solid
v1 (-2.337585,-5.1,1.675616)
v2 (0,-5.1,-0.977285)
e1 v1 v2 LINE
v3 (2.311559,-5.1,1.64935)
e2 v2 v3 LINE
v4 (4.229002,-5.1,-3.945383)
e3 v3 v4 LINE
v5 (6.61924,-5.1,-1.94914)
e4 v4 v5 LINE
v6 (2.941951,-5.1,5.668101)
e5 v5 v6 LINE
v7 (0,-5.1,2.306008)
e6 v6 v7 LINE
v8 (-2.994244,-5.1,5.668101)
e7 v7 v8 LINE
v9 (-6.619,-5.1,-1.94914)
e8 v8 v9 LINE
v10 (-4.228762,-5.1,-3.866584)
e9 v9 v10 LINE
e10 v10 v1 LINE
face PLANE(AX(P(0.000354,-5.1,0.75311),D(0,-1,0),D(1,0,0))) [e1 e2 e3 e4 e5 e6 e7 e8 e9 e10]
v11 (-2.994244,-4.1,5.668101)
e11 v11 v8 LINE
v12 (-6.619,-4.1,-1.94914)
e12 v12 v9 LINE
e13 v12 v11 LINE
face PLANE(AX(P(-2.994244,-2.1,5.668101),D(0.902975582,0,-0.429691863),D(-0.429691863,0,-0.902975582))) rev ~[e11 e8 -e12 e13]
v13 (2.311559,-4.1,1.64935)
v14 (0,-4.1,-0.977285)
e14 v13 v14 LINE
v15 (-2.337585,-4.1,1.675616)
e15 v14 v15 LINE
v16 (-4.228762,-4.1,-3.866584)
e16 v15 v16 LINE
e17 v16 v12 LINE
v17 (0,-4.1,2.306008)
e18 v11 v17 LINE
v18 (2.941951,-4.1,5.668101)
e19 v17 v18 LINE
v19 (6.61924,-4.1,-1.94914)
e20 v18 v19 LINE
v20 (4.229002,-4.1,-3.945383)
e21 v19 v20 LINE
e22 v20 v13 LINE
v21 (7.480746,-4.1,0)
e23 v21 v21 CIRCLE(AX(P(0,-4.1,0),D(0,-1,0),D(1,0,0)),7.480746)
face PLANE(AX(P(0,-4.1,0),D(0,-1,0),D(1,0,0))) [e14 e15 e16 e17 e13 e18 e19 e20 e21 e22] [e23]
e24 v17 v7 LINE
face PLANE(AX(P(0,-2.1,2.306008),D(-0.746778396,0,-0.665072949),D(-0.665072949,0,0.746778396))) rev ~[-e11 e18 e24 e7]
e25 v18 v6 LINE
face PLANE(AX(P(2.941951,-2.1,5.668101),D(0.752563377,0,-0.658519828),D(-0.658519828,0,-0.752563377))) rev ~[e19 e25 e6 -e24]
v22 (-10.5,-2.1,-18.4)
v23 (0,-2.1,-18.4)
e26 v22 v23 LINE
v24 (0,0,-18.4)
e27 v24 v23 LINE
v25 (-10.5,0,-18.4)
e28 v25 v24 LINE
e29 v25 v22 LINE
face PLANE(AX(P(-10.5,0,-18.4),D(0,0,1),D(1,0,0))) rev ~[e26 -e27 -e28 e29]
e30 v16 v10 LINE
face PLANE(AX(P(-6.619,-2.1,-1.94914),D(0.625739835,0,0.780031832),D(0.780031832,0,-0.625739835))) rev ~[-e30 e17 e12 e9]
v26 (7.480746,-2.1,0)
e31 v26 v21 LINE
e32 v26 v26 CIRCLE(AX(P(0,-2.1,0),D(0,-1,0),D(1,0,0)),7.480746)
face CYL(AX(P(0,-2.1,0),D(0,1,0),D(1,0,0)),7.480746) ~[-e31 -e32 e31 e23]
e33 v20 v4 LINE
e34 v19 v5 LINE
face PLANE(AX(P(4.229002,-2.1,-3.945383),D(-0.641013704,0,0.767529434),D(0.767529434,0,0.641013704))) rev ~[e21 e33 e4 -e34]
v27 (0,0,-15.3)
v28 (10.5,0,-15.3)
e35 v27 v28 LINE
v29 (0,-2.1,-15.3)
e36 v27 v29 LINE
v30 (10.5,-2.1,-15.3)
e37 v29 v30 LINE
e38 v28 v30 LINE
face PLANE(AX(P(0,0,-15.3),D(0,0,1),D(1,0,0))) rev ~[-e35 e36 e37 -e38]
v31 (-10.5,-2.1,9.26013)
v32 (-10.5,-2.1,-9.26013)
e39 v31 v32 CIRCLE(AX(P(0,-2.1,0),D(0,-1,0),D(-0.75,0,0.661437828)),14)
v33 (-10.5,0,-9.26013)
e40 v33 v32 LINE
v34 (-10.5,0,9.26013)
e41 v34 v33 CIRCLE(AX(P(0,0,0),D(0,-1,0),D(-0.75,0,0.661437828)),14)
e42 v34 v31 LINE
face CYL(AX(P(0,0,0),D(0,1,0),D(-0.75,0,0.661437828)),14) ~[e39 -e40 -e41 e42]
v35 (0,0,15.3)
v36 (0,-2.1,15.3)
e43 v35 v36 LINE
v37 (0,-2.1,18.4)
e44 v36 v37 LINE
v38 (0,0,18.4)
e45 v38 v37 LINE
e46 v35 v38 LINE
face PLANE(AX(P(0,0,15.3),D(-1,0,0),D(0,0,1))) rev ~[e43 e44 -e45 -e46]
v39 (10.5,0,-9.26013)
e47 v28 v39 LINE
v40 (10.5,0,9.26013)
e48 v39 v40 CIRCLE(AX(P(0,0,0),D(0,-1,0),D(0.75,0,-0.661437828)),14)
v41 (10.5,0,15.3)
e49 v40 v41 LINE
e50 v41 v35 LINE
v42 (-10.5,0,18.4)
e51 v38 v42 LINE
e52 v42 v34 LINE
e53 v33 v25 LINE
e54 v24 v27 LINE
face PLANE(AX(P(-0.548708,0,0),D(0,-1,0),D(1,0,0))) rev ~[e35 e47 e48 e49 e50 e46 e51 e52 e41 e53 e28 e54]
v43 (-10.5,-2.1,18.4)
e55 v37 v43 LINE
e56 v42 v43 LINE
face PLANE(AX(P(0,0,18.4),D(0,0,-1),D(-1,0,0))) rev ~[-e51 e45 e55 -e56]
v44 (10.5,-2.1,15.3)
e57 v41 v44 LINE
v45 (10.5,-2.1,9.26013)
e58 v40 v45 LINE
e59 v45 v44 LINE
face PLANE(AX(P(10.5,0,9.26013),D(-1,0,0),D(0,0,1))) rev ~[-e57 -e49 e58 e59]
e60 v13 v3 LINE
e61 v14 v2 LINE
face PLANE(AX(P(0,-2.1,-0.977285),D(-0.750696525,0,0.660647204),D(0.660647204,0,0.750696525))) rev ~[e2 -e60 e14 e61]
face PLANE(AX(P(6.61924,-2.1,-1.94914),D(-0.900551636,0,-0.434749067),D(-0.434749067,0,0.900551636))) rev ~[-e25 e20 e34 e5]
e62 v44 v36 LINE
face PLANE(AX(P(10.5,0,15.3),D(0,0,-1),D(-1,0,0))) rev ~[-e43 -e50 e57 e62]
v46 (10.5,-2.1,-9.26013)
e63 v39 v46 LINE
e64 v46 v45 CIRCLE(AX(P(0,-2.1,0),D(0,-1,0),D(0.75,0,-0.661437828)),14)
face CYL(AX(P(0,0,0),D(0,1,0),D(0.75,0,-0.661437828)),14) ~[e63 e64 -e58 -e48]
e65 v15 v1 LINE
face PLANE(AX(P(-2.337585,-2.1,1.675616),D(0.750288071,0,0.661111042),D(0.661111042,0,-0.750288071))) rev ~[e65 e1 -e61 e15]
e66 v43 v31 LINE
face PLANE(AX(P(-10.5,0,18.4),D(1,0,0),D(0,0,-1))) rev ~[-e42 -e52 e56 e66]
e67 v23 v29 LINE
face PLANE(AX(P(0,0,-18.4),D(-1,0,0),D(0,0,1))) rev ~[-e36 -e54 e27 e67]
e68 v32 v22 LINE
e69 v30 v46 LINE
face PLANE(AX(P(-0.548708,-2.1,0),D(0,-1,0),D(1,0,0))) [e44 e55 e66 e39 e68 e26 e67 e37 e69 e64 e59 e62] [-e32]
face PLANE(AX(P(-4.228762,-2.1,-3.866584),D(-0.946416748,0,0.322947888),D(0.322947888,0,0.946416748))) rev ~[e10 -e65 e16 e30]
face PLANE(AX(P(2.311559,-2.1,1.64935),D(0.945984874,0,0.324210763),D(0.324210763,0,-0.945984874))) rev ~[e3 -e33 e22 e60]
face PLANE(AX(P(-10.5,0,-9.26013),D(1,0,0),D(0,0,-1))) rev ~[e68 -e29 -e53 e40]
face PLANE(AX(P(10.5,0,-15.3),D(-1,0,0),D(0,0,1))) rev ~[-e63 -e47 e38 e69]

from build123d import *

# Parameters (mm, degrees)
F1_DEPTH = 2.1
F3_DEPTH = 3
F2_R     = 7.4807460639
F4_DEPTH = 2


# Not quite as in the source:
# - a feature names something its author has since deleted; it is built from what else it names


with BuildPart() as f1:
    # F0 (on Front) → F1 (new body)
    with BuildSketch(Plane.XZ):
        with BuildLine():
            Line((0, 15.3), (0, 18.4))
            Line((0, 18.4), (-10.5, 18.4))
            Line((-10.5, 18.4), (-10.5, 9.2601295887))
            ThreePointArc((-10.5, 9.2601295887), (-14, 0), (-10.5, -9.2601295887))
            Line((-10.5, -9.2601295887), (-10.5, -18.4))
            Line((-10.5, -18.4), (0, -18.4))
            Line((0, -18.4), (0, -15.3))
            Line((0, -15.3), (10.5, -15.3))
            Line((10.5, -15.3), (10.5, -9.2601295887))
            ThreePointArc((10.5, -9.2601295887), (14, 0), (10.5, 9.2601295887))
            Line((10.5, 9.2601295887), (10.5, 15.3))
            Line((10.5, 15.3), (0, 15.3))
        make_face()
    extrude(amount=F1_DEPTH)

    # F2 (on face) → F3 (join)
    with BuildSketch(Plane.XZ.offset(2.1)):
        Polygon((-2.9942439869, 5.6681009009), (-6.6190003417, -1.9491401035), (-4.228762351, -3.8665838074), (-2.3375852033, 1.6756160185), (0, -0.9772852063), (2.3115586955, 1.6493498115), (4.2290021665, -3.9453827776), (6.6192396916, -1.9491401035), (2.9419509228, 5.6681009009), (0, 2.3060084786), align=None)
    extrude(amount=F3_DEPTH)

    # F2 (on face) → F4 (join)
    with BuildSketch(Plane.XZ.offset(2.1)):
        Circle(F2_R)
        Polygon((-4.228762351, -3.8665838074), (-6.6190003417, -1.9491401035), (-2.9942439869, 5.6681009009), (0, 2.3060084786), (2.9419509228, 5.6681009009), (6.6192396916, -1.9491401035), (4.2290021665, -3.9453827776), (2.3115586955, 1.6493498115), (0, -0.9772852063), (-2.3375852033, 1.6756160185), align=None, mode=Mode.SUBTRACT)
    extrude(amount=F4_DEPTH)


solid = f1.part
